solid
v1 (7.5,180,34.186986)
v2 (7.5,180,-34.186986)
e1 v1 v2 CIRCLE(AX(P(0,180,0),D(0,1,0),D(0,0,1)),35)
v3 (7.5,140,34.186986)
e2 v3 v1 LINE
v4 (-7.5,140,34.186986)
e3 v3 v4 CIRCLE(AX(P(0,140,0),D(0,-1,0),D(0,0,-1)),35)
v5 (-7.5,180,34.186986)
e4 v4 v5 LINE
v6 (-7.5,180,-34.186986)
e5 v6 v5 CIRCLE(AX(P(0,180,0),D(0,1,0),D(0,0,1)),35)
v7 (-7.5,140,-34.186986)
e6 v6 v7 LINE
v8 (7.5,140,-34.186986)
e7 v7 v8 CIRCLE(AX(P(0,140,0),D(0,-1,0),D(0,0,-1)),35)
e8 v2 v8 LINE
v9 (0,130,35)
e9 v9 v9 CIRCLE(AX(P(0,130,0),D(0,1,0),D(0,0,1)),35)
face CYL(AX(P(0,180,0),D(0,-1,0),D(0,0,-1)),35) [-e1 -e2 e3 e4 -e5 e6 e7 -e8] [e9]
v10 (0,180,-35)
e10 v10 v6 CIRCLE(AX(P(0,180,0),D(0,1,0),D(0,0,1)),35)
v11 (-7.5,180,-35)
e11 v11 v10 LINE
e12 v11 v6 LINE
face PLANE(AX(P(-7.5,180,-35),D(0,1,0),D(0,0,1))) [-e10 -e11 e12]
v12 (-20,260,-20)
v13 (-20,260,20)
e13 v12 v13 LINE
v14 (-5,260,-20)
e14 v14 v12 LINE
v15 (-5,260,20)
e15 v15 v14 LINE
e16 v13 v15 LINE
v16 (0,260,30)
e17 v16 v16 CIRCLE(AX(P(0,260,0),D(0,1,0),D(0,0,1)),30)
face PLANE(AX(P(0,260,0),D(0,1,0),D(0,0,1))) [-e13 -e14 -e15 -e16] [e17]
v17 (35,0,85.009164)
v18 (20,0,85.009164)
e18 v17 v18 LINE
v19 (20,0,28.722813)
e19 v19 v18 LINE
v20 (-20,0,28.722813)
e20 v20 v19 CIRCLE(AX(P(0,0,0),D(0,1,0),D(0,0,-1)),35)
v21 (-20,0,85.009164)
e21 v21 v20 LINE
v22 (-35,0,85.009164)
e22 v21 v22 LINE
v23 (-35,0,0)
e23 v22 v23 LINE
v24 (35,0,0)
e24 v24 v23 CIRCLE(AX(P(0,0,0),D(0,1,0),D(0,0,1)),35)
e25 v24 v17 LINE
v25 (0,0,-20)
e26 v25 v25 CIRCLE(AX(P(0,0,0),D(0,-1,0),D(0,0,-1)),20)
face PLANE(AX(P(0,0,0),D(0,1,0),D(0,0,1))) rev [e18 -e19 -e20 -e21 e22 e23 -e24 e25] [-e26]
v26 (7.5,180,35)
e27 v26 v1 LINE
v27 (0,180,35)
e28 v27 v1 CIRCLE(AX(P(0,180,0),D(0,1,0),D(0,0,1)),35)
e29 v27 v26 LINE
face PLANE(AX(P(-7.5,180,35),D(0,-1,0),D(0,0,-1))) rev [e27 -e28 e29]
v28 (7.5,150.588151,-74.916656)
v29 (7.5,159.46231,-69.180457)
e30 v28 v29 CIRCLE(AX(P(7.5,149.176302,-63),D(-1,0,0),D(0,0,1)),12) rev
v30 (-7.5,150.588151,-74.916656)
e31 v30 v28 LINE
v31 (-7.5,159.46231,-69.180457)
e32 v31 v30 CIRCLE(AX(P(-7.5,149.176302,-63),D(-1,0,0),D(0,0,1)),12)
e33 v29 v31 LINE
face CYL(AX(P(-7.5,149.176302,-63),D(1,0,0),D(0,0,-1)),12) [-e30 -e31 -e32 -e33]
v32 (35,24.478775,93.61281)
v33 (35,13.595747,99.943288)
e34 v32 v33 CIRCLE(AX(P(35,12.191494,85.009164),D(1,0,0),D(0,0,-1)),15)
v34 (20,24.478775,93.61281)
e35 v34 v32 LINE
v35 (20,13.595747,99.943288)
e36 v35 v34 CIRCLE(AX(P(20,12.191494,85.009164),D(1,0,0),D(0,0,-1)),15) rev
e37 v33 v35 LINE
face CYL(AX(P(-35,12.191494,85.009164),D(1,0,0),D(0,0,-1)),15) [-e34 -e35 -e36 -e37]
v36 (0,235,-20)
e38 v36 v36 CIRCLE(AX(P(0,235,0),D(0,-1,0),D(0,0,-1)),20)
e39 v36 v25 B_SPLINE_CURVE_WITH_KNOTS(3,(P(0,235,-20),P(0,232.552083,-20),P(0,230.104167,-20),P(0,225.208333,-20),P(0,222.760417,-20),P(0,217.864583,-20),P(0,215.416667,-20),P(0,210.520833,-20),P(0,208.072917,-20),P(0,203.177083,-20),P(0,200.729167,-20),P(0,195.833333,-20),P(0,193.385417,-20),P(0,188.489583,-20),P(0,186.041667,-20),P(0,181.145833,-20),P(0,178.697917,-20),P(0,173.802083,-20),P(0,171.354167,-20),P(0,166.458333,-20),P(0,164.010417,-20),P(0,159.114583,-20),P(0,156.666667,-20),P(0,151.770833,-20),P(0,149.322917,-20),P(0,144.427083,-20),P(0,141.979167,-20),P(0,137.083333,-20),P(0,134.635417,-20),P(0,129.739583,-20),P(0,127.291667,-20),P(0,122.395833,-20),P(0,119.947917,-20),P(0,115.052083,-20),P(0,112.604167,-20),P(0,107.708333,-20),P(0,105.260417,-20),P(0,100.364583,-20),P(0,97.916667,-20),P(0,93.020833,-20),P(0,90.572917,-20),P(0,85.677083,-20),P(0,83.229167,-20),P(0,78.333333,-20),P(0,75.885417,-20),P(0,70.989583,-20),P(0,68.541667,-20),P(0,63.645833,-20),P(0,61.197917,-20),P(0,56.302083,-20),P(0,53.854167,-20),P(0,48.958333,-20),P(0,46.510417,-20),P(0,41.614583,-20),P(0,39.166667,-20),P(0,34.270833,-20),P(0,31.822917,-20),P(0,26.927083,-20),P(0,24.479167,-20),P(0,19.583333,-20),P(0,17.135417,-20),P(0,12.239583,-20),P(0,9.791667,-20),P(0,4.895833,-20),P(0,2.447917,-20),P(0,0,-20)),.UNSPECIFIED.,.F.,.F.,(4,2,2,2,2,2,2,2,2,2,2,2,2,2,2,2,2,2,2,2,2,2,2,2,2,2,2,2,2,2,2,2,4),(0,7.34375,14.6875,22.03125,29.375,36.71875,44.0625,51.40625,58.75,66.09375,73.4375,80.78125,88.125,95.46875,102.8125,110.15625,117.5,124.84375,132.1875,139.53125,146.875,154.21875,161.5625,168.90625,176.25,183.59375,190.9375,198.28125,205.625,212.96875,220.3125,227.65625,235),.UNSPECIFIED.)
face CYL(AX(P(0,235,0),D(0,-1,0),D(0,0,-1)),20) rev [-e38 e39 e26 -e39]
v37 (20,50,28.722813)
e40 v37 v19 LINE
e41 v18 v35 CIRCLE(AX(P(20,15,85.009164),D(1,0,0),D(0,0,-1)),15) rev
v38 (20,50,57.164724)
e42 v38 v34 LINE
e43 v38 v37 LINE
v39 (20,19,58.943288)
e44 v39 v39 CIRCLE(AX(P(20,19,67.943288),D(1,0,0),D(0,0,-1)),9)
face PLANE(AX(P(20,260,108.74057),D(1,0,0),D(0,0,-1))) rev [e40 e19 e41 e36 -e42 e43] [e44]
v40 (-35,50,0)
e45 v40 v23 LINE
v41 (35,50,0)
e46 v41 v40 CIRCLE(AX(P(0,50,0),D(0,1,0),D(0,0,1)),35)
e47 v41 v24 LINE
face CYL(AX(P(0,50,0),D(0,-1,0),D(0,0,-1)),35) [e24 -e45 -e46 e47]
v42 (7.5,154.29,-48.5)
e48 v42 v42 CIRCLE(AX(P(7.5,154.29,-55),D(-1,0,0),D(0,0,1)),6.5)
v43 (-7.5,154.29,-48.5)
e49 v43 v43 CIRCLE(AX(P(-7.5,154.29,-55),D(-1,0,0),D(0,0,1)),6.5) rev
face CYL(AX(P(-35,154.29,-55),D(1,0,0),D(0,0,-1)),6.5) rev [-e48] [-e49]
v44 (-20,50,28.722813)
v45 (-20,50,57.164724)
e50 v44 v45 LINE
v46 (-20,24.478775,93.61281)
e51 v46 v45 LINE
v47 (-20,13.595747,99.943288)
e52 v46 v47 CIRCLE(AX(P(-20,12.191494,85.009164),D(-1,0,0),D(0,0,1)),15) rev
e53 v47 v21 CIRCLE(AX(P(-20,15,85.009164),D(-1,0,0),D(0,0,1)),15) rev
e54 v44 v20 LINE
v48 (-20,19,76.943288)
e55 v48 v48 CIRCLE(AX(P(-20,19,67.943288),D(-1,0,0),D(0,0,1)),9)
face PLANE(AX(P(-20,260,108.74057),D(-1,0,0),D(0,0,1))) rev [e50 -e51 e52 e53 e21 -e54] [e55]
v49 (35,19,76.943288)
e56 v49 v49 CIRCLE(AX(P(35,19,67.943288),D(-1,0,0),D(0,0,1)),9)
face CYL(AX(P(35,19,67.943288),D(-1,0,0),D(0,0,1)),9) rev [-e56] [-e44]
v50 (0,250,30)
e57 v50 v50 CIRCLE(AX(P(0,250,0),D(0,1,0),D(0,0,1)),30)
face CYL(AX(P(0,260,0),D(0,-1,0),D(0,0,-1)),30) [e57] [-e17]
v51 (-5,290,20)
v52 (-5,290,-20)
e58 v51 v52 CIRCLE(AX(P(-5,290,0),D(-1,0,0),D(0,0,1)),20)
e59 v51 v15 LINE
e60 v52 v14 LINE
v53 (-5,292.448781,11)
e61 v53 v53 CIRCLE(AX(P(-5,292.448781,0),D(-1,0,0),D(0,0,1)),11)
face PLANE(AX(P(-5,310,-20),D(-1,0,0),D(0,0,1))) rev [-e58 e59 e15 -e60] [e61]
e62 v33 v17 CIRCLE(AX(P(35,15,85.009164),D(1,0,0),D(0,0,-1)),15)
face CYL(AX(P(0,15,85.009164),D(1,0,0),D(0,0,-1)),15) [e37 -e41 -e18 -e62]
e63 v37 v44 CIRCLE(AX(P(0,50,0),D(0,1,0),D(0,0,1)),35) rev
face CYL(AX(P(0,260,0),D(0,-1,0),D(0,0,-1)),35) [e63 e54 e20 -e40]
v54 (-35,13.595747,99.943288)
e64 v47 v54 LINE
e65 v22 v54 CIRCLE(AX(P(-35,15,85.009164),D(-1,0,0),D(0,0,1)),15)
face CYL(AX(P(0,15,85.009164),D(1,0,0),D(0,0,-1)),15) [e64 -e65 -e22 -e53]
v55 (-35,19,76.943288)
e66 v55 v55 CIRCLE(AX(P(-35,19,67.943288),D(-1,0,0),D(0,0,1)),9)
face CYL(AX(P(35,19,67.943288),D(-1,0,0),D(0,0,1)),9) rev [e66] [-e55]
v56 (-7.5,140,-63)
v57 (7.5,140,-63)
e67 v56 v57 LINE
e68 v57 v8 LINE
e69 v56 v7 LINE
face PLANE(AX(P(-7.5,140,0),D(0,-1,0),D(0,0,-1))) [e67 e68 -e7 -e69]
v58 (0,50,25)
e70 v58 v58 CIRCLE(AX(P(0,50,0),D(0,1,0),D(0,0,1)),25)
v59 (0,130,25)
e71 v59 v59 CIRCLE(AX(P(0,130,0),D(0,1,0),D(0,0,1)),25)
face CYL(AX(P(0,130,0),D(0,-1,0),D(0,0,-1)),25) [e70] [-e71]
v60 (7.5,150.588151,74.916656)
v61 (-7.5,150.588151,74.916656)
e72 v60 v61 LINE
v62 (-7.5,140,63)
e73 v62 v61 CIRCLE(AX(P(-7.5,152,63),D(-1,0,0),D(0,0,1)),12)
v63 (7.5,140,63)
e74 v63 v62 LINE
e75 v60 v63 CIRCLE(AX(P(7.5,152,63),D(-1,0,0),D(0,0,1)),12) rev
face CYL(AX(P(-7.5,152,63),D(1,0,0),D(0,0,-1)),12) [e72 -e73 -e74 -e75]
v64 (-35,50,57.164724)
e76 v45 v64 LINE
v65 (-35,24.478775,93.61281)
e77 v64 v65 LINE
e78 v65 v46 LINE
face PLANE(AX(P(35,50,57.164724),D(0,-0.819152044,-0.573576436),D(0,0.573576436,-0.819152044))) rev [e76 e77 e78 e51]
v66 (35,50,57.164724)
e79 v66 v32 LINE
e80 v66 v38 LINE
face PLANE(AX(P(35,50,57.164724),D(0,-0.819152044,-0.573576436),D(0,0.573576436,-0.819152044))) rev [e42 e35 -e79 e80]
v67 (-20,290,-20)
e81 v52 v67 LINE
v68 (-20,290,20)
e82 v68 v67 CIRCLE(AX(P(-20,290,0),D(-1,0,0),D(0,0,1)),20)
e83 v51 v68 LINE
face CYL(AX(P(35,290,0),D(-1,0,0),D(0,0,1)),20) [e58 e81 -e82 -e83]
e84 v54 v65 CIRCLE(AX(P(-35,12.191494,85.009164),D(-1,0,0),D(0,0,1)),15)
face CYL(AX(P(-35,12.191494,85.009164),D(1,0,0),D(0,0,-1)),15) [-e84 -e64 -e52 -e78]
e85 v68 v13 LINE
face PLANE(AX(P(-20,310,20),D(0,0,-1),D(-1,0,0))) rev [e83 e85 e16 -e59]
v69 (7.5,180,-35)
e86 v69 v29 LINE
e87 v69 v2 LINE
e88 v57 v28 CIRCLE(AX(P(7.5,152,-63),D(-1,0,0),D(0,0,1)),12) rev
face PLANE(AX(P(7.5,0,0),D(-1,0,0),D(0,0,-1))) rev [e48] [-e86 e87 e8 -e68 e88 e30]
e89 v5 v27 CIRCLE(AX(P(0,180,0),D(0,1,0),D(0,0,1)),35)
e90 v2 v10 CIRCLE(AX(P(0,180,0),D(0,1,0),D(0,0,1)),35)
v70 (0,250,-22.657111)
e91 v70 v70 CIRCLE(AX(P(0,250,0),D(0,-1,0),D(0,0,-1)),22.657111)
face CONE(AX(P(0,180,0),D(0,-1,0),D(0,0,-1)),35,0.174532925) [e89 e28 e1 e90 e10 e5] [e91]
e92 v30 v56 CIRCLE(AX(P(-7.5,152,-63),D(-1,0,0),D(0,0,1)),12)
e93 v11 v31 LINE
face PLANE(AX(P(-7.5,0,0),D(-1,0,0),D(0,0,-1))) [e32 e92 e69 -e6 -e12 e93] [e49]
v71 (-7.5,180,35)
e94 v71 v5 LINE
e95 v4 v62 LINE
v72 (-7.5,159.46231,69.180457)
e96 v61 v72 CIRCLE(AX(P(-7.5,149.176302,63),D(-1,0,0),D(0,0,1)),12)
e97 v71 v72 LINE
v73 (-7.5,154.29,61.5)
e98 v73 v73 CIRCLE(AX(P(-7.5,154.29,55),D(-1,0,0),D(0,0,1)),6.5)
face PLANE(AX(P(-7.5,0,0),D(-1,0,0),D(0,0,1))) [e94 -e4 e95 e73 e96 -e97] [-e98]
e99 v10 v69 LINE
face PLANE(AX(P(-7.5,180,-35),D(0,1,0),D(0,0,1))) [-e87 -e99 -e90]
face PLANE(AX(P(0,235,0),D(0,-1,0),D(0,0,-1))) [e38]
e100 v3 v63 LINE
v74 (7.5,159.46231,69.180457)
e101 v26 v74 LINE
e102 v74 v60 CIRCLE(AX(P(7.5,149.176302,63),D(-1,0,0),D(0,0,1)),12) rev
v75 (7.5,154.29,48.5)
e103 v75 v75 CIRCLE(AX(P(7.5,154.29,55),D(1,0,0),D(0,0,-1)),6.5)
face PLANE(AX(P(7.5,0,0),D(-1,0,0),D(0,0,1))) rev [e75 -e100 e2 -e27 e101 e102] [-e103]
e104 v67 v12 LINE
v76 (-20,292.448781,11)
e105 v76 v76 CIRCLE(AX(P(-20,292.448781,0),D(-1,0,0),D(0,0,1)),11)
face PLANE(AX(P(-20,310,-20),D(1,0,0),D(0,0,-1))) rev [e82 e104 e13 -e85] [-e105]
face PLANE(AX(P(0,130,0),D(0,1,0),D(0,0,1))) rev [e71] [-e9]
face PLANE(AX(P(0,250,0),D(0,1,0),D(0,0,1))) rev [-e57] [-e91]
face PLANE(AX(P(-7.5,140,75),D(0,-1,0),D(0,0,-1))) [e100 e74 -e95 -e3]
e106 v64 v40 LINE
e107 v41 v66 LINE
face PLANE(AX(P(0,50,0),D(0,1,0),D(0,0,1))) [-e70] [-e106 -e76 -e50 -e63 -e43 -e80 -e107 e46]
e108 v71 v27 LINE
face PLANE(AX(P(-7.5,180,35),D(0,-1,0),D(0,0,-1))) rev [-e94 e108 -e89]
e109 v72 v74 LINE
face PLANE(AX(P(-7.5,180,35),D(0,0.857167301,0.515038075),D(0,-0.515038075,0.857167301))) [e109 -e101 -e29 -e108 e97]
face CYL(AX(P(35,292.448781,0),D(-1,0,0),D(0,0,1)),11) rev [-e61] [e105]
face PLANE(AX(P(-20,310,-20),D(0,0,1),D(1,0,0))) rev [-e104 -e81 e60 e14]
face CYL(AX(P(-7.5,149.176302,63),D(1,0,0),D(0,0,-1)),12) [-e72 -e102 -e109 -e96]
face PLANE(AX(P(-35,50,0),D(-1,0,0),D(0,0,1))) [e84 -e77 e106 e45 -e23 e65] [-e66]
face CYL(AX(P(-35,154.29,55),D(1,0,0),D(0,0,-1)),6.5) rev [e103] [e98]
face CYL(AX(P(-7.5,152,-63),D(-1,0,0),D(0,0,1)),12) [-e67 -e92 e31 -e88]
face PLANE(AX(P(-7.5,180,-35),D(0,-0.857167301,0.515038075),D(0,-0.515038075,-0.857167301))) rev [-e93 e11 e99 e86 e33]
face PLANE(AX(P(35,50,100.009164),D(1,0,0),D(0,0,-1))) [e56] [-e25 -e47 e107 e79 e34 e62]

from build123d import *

# Parameters (mm, degrees)
SKETCH1_R           = 35
BOSS_EXTRUDE1_DEPTH = 50
SKETCH6_R           = 25
BOSS_EXTRUDE2_DEPTH = 80
SKETCH7_R           = 35
BOSS_EXTRUDE3_DEPTH = 50
SKETCH10_R          = 30
BOSS_EXTRUDE5_DEPTH = 10
SKETCH12_W          = 70
SKETCH12_H          = 100.009163948
BOSS_EXTRUDE6_DEPTH = 50
CUT_EXTRUDE1_DEPTH  = 288.231322933
CUT_EXTRUDE2_DEPTH  = 281.761166962
FILLET1_R           = 15
SKETCH15_R          = 9
CUT_EXTRUDE3_DEPTH  = 288.208392811
BOSS_EXTRUDE8_DEPTH = 7.5
FILLET2_R           = 12
SKETCH17_R          = 6.5
CUT_EXTRUDE4_DEPTH  = 282.771025659
FILLET3_R           = 12
SKETCH18_W          = 15
SKETCH18_H          = 40
BOSS_EXTRUDE9_DEPTH = 50
CUT_EXTRUDE5_DEPTH  = 331.323570005
SKETCH20_R          = 11
CUT_EXTRUDE6_DEPTH  = 331.323570005
SKETCH21_R          = 20
CUT_EXTRUDE7_DEPTH  = 235


with BuildPart() as part:
    # Sketch1 → Boss-Extrude1 (new body)
    with BuildSketch(Plane(origin=(0, 0, 0), x_dir=(1, 0, 0), z_dir=(0, 1, 0))):
        with Locations(Location((0, 0, 0), (0, 0, 270))):
            Circle(SKETCH1_R)
    extrude(amount=BOSS_EXTRUDE1_DEPTH)

    # Sketch6 → Boss-Extrude2 (add)
    with BuildSketch(Plane(origin=(0, 50, 0), x_dir=(1, 0, 0), z_dir=(0, 1, 0))):
        with Locations(Location((0, 0, 0), (0, 0, 270))):
            Circle(SKETCH6_R)
    extrude(amount=BOSS_EXTRUDE2_DEPTH)

    # Sketch7 → Boss-Extrude3 (add)
    with BuildSketch(Plane(origin=(0, 130, 0), x_dir=(1, 0, 0), z_dir=(0, 1, 0))):
        with Locations(Location((0, 0, 0), (0, 0, 270))):
            Circle(SKETCH7_R)
    extrude(amount=BOSS_EXTRUDE3_DEPTH)



with BuildPart() as body_2:
    # Sketch10 → Boss-Extrude5 (new body)
    with BuildSketch(Plane(origin=(0, 250, 0), x_dir=(1, 0, 0), z_dir=(0, 1, 0))):
        with Locations(Location((0, 0, 0), (0, 0, 270))):
            Circle(SKETCH10_R)
    extrude(amount=BOSS_EXTRUDE5_DEPTH)


with BuildPart() as part_1:
    add(part.part)

    add(body_2.part)  # Revolve1 merges body 2
    # Sketch11 → Revolve1 (revolve)
    with BuildSketch(Plane(origin=(0, 0, 0), x_dir=(0, 0, -1), z_dir=(1, 0, 0))):
        Polygon((0, 250), (22.65711135, 250), (35, 180), (0, 180), align=None)
    revolve(axis=Axis((0, 180, 0), (0, 1, 0)))

    # Sketch12 → Boss-Extrude6 (add)
    with BuildSketch(Plane.XZ):
        with Locations((0, 50.004581974)):
            Rectangle(SKETCH12_W, SKETCH12_H)
    extrude(amount=-BOSS_EXTRUDE6_DEPTH)

    # Sketch13 → Cut-Extrude1 (cut, through all)
    with BuildSketch(Plane.ZY.offset(35)):
        Polygon((57.164723746, 50), (100.009163948, 20), (100.009163948, 50), align=None)
    extrude(amount=-CUT_EXTRUDE1_DEPTH, mode=Mode.SUBTRACT)

    # Sketch14 → Cut-Extrude2 (cut, through all)
    with BuildSketch(Plane.XZ):
        with BuildLine():
            Line((-20, 108.740570097), (20, 108.740570097))
            Line((20, 108.740570097), (20, 28.722813233))
            ThreePointArc((20, 28.722813233), (0, 35), (-20, 28.722813233))
            Line((-20, 28.722813233), (-20, 108.740570097))
        make_face()
    extrude(amount=-CUT_EXTRUDE2_DEPTH, mode=Mode.SUBTRACT)

    # Fillet1
    # the kernel refuses this fillet: 15 mm, written as the material it takes off along each edge
    with BuildSketch(Plane(origin=(-17.5, 0, 100.009163948), x_dir=(0, 0, -1), z_dir=(1, 0, 0)), Plane(origin=(-72.5, 0, 100.009163948), x_dir=(0, 0, -1), z_dir=(1, 0, 0))) as fillet1_piece_1:
        with BuildLine():
            CenterArc((FILLET1_R, FILLET1_R), FILLET1_R, 180, 90)
            Line((0, FILLET1_R), (0, 0))
            Line((0, 0), (FILLET1_R, 0))
        make_face()
    extrude(amount=90, mode=Mode.SUBTRACT)
    with BuildSketch(Plane(origin=(0.478735604, 20, 100.009163948), x_dir=(0, -1, 0), z_dir=(1, 0, 0)), Plane(origin=(-54.521264396, 20, 100.009163948), x_dir=(0, -1, 0), z_dir=(1, 0, 0))) as fillet1_piece_2:
        with BuildLine():
            CenterArc((FILLET1_R * 0.520567050552, FILLET1_R), FILLET1_R, 215, 55)
            Line((-FILLET1_R * 0.298584993737, FILLET1_R * 0.426423563649), (0, 0))
            Line((0, 0), (FILLET1_R * 0.520567050552, 0))
        make_face()
    extrude(amount=54.042528791, mode=Mode.SUBTRACT)

    # Sketch15 → Cut-Extrude3 (cut, through all)
    with BuildSketch(Plane.ZY.offset(35)):
        with Locations((67.943288424, 19)):
            Circle(SKETCH15_R)
    extrude(amount=-CUT_EXTRUDE3_DEPTH, mode=Mode.SUBTRACT)

    # Sketch16 → Boss-Extrude8 (add, symmetric)
    with BuildSketch(Plane(origin=(0, 0, 0), x_dir=(0, 0, -1), z_dir=(1, 0, 0))):
        Polygon((-35, 180), (-75, 155.965575239), (-75, 140), (-35, 140), (0, 140), (0, 180), align=None)
    boss_extrude8 = extrude(amount=BOSS_EXTRUDE8_DEPTH, both=True)

    # Fillet2
    # the kernel refuses this fillet: 12 mm, written as the material it takes off along each edge
    with BuildSketch(Plane(origin=(-37.5, 140, 75), x_dir=(0, 0, -1), z_dir=(1, 0, 0))) as fillet2_piece_1:
        with BuildLine():
            CenterArc((FILLET2_R, FILLET2_R), FILLET2_R, 180, 90)
            Line((0, FILLET2_R), (0, 0))
            Line((0, 0), (FILLET2_R, 0))
        make_face()
    extrude(amount=75, mode=Mode.SUBTRACT)
    with BuildSketch(Plane(origin=(-24.473183346, 155.965575239, 75), x_dir=(0, 0.5150380749100483, -0.8571673007021159), z_dir=(1, 0, 0))) as fillet2_piece_2:
        with BuildLine():
            CenterArc((FILLET2_R * 0.565772778188, -FILLET2_R), FILLET2_R, 90, 59)
            Line((-FILLET2_R * 0.291394522514, -FILLET2_R * 0.48496192509), (0, 0))
            Line((0, 0), (FILLET2_R * 0.565772778188, 0))
        make_face()
    extrude(amount=48.946366691, mode=Mode.SUBTRACT)

    # Sketch17 → Cut-Extrude4 (cut, through all)
    with BuildSketch(Plane(origin=(7.5, 0, 0), x_dir=(0, 0, -1), z_dir=(1, 0, 0))):
        with Locations((-55, 154.29)):
            Circle(SKETCH17_R)
    cut_extrude4 = extrude(amount=-CUT_EXTRUDE4_DEPTH, mode=Mode.SUBTRACT)

    # Mirror1: Boss-Extrude8 across plane
    add(boss_extrude8.mirror(Plane.XY))

    # Fillet3
    # the kernel refuses this fillet: 12 mm, written as the material it takes off along each edge
    with BuildSketch(Plane(origin=(-37.5, 140, -75), x_dir=(0, 0, 1), z_dir=(1, 0, 0))) as fillet3_piece_1:
        with BuildLine():
            CenterArc((FILLET3_R, -FILLET3_R), FILLET3_R, 90, 90)
            Line((0, -FILLET3_R), (0, 0))
            Line((0, 0), (FILLET3_R, 0))
        make_face()
    extrude(amount=75, mode=Mode.SUBTRACT)
    with BuildSketch(Plane(origin=(-24.473183346, 155.965575239, -75), x_dir=(0, 0.5150380749100483, 0.8571673007021159), z_dir=(1, 0, 0))) as fillet3_piece_2:
        with BuildLine():
            CenterArc((FILLET3_R * 0.565772778188, FILLET3_R), FILLET3_R, 211, 59)
            Line((-FILLET3_R * 0.291394522514, FILLET3_R * 0.48496192509), (0, 0))
            Line((0, 0), (FILLET3_R * 0.565772778188, 0))
        make_face()
    extrude(amount=48.946366691, mode=Mode.SUBTRACT)

    # Mirror2: Cut-Extrude4 across plane
    add(cut_extrude4.mirror(Plane.XY), mode=Mode.SUBTRACT)

    # Sketch18 → Boss-Extrude9 (add)
    with BuildSketch(Plane(origin=(0, 260, 0), x_dir=(1, 0, 0), z_dir=(0, 1, 0))):
        with Locations((-12.5, 0)):
            Rectangle(SKETCH18_W, SKETCH18_H)
    extrude(amount=BOSS_EXTRUDE9_DEPTH)

    # Sketch19 → Cut-Extrude5 (cut, through all)
    with BuildSketch(Plane.ZY.offset(20)):
        with BuildLine():
            Line((20, 310), (-1.45e-07, 310))
            ThreePointArc((-1.45e-07, 310), (14.142135572, 304.142135675), (20, 290))
            Line((20, 290), (20, 310))
        make_face()
        with BuildLine():
            Line((-20, 310), (-20, 290))
            ThreePointArc((-20, 290), (-14.142135675, 304.142135572), (-1.45e-07, 310))
            Line((-1.45e-07, 310), (-20, 310))
        make_face()
    extrude(amount=-CUT_EXTRUDE5_DEPTH, mode=Mode.SUBTRACT)

    # Sketch20 → Cut-Extrude6 (cut, through all)
    with BuildSketch(Plane.ZY.offset(20)):
        with Locations((0, 292.448780647)):
            Circle(SKETCH20_R)
    extrude(amount=-CUT_EXTRUDE6_DEPTH, mode=Mode.SUBTRACT)

    # Sketch21 → Cut-Extrude7 (cut)
    with BuildSketch(Plane.XZ):
        with Locations(Location((0, 0, 0), (0, 0, 270))):
            Circle(SKETCH21_R)
    extrude(amount=-CUT_EXTRUDE7_DEPTH, mode=Mode.SUBTRACT)


solid = part_1.part
